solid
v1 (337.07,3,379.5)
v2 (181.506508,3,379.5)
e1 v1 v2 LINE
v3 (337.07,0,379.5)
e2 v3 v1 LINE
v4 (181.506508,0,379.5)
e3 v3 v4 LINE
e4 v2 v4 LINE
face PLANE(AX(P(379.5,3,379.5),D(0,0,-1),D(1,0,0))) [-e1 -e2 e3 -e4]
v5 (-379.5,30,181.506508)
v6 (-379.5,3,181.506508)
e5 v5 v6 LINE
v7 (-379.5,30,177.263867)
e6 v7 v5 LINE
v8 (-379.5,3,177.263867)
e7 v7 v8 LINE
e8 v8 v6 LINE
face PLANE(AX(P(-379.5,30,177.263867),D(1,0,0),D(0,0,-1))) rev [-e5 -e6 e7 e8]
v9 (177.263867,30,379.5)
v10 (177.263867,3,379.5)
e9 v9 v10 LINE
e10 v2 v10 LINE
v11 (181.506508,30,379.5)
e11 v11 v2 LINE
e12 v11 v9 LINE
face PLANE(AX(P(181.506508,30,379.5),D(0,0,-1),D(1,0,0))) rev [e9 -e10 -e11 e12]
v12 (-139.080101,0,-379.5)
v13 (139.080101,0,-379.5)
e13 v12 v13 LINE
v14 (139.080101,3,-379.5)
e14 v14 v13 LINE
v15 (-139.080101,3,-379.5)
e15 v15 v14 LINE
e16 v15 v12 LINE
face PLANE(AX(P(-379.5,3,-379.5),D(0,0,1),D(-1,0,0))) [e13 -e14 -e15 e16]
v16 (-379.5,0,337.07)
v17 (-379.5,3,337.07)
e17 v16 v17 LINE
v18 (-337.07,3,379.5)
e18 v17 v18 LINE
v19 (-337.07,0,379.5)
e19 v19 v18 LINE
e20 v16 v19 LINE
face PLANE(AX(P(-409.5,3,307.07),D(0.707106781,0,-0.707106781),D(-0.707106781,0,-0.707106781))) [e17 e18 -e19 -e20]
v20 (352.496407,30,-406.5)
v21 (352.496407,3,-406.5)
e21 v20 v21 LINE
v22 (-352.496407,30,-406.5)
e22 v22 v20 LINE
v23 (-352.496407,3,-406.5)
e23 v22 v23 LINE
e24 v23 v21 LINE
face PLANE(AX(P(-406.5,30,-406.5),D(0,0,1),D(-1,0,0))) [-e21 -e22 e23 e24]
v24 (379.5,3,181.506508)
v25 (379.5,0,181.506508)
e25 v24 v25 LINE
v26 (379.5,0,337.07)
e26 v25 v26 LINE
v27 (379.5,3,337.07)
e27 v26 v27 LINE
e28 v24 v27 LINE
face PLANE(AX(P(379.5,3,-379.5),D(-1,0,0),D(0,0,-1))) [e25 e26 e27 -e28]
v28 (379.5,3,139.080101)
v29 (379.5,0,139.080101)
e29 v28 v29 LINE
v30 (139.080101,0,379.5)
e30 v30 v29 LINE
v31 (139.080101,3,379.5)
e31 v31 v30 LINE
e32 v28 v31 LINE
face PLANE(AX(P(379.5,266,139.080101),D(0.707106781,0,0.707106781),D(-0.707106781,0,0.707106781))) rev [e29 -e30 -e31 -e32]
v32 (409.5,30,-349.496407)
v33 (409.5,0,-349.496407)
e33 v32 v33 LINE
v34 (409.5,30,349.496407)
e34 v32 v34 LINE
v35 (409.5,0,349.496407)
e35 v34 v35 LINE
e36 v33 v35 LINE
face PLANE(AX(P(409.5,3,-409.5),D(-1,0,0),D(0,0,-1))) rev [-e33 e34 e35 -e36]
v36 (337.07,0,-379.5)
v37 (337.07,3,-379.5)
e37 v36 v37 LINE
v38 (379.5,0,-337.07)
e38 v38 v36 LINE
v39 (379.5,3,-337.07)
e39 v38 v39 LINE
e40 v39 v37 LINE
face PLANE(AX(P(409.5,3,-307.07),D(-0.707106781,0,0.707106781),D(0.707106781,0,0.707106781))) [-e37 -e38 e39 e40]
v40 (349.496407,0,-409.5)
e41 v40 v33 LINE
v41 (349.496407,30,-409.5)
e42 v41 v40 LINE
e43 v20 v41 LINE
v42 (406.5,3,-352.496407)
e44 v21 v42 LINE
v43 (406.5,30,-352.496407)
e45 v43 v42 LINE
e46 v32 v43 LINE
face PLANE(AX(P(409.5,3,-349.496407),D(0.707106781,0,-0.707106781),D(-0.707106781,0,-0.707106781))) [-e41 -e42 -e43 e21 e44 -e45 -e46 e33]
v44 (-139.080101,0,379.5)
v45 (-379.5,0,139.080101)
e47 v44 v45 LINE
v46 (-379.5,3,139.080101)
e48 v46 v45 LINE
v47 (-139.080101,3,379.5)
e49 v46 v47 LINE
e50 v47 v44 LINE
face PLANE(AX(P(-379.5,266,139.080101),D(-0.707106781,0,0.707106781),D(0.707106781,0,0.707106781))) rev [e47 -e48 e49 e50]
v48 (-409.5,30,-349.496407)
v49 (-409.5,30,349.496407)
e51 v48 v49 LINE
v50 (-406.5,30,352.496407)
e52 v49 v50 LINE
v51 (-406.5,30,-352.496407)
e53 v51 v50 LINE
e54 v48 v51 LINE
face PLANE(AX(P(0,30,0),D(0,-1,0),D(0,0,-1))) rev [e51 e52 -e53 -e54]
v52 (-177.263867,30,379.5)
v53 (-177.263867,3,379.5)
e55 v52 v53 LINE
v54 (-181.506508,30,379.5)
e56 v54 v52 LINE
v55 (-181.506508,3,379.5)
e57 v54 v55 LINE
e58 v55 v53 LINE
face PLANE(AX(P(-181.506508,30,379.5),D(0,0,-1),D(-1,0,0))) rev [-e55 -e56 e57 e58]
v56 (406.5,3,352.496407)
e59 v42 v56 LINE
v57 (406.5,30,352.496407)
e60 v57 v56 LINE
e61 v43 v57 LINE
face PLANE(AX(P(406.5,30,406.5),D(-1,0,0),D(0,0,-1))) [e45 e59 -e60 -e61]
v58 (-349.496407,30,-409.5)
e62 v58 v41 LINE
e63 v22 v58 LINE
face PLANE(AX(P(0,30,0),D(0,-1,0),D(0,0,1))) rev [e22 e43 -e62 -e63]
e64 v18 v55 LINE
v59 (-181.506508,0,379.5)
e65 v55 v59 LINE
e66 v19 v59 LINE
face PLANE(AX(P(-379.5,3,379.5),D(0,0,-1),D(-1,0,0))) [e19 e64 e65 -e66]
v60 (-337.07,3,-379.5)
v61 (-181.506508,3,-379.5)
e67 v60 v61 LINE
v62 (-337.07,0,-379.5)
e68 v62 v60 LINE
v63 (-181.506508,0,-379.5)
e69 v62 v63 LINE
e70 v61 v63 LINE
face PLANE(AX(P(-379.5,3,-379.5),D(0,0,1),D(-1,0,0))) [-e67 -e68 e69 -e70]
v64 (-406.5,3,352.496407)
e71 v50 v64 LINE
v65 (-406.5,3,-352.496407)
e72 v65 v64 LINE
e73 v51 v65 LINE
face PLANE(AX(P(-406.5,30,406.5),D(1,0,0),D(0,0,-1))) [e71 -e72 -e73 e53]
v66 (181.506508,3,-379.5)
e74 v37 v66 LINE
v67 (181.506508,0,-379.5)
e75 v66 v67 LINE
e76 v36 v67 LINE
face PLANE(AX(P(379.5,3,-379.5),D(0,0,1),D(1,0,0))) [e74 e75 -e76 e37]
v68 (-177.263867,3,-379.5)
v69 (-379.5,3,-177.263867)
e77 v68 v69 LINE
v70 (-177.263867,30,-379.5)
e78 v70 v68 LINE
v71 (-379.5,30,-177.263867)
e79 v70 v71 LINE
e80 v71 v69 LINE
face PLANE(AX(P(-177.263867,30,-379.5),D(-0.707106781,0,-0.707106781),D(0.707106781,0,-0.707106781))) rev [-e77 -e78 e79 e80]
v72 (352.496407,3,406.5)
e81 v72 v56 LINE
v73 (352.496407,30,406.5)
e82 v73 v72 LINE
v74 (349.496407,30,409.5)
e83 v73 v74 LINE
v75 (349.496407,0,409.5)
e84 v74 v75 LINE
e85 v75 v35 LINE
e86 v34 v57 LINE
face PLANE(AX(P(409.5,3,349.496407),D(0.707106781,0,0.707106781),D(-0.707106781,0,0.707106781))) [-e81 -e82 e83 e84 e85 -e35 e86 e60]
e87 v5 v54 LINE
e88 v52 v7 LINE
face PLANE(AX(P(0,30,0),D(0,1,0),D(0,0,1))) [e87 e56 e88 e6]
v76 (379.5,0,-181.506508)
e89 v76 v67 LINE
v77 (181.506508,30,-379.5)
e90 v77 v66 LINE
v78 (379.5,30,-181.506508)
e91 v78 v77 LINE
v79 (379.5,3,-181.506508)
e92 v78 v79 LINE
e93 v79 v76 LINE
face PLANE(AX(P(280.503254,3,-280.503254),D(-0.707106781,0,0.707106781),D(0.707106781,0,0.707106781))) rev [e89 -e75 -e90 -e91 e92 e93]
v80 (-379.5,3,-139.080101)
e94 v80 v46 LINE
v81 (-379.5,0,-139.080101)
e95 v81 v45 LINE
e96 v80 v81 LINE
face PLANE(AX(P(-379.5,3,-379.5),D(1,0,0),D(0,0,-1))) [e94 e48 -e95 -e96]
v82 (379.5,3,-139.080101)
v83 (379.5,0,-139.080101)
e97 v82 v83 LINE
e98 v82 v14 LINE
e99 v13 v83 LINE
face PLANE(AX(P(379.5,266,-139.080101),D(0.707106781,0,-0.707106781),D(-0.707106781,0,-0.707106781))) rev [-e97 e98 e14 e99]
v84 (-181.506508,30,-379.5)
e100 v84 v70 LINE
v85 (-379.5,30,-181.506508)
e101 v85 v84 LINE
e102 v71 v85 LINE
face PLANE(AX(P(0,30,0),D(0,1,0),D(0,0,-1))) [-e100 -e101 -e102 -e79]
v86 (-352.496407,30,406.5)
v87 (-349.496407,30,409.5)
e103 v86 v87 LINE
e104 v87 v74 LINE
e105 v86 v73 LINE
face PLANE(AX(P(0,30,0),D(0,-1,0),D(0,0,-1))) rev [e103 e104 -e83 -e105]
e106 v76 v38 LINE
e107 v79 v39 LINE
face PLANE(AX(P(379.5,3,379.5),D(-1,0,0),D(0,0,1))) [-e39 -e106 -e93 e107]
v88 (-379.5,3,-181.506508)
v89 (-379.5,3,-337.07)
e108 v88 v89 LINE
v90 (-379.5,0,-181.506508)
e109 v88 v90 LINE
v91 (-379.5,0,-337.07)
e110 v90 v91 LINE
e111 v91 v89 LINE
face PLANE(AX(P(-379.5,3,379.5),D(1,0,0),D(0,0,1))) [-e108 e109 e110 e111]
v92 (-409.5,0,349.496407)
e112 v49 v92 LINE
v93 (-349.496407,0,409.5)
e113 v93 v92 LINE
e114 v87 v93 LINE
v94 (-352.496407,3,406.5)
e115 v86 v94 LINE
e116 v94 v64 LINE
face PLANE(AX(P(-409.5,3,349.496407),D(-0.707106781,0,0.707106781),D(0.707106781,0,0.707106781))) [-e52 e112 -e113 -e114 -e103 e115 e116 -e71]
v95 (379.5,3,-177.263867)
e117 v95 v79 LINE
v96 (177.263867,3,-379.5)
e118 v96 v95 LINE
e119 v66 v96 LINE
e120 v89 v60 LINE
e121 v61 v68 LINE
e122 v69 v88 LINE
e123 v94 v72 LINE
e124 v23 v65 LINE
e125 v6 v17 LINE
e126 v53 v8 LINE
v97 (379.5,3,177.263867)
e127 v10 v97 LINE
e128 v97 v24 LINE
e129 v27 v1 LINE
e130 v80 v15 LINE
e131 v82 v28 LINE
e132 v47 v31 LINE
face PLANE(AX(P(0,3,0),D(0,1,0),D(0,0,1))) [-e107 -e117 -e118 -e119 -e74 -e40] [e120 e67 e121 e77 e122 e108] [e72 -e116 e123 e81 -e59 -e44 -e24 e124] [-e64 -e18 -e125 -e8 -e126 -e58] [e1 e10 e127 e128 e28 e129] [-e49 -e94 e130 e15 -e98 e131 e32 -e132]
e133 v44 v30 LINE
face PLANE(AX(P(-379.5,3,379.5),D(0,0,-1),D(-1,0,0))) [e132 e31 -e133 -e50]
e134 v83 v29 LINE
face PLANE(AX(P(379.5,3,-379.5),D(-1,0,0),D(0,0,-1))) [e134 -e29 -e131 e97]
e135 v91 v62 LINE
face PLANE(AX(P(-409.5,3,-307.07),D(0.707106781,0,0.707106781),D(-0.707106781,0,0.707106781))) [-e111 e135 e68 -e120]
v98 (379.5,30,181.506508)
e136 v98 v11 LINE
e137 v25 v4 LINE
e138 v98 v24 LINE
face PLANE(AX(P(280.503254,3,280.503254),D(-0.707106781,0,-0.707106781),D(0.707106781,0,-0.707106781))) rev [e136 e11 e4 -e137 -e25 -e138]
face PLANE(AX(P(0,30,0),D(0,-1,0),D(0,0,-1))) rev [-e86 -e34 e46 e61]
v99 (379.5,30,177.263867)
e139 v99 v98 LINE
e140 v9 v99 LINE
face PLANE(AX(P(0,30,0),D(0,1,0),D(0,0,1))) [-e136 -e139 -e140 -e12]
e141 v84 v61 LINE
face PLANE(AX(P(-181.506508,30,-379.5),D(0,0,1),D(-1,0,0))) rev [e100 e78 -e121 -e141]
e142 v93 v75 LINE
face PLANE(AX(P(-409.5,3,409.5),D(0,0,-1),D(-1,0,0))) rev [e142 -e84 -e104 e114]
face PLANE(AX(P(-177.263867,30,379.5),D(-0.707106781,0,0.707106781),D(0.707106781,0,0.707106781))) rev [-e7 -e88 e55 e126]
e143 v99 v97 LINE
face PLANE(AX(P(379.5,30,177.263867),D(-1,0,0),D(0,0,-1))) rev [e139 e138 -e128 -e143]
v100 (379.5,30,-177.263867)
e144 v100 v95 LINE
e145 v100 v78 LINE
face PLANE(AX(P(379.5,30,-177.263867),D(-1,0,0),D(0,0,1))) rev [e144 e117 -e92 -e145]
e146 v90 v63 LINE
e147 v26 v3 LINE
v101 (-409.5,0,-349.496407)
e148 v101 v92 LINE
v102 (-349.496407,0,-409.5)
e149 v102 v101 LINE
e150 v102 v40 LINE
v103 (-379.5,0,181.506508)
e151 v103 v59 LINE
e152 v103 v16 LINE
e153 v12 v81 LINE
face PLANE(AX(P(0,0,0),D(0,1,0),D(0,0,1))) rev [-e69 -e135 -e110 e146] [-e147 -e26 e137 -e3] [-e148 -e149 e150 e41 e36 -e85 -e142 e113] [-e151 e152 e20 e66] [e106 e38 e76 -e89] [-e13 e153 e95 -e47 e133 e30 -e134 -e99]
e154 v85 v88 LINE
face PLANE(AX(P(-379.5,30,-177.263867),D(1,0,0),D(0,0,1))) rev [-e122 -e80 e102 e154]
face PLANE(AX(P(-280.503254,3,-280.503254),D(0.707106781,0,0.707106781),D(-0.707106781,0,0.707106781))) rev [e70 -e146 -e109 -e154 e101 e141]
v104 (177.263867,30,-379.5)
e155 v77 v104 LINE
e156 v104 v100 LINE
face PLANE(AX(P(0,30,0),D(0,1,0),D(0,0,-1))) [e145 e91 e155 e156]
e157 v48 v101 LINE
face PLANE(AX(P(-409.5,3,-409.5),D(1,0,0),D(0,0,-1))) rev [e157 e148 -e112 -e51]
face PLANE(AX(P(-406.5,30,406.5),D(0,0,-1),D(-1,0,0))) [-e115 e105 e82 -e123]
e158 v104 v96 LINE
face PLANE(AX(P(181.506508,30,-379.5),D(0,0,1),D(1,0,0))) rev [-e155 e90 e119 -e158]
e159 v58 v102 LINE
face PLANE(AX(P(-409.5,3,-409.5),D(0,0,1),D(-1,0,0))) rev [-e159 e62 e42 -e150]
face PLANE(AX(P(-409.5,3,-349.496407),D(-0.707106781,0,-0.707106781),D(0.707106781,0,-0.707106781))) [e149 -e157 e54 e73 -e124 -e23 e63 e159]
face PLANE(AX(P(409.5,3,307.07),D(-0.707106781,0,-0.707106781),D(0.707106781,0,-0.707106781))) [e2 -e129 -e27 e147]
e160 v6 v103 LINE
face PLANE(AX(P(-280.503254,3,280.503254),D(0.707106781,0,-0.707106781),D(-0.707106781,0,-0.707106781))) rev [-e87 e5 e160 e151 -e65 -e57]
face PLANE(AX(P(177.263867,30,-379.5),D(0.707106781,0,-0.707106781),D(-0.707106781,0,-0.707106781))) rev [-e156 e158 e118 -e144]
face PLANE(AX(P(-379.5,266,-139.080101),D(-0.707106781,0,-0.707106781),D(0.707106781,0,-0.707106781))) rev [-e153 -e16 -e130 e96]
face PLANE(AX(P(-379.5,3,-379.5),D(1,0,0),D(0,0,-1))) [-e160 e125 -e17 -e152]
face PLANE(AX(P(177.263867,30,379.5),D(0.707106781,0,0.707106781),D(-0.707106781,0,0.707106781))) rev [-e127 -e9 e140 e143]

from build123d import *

# Parameters (mm, degrees)
SKETCH1_W            = 819
SKETCH1_H            = 819
SKETCH1_W_2          = 759
SKETCH1_H_2          = 759
BOSS_EXTRUDE1_DEPTH  = 3
SKETCH2_W            = 819
SKETCH2_H            = 819
SKETCH2_W_2          = 813
SKETCH2_H_2          = 813
BOSS_EXTRUDE2_DEPTH  = 27
BOSS_EXTRUDE3_DEPTH  = 3
CUT_EXTRUDE1_DEPTH   = 130
BOSS_EXTRUDE4_DEPTH  = 3
BOSS_EXTRUDE5_DEPTH  = 27
CUT_EXTRUDE2_DEPTH   = 163
MIRROR3_DEPTH        = 30
MIRROR3_2_DEPTH      = 3
MIRROR4_DEPTH        = 30
MIRROR4_2_DEPTH      = 3
CUT_EXTRUDE3_START   = -673
CUT_EXTRUDE3_DEPTH   = 1124
CUT_EXTRUDE4_DEPTH   = 300
BOSS_EXTRUDE8_DEPTH  = 3
BOSS_EXTRUDE9_DEPTH  = 27
BOSS_EXTRUDE10_DEPTH = 3
CUT_EXTRUDE9_DEPTH   = 266
CUT_EXTRUDE10_DEPTH  = 27
CUT_EXTRUDE11_DEPTH  = 27
BOSS_EXTRUDE13_DEPTH = 27
BOSS_EXTRUDE15_DEPTH = 3
BOSS_EXTRUDE16_DEPTH = 27
MIRROR17_DEPTH       = 3
MIRROR17_START       = 3
MIRROR17_2_DEPTH     = 27
MIRROR26_DEPTH       = 3
MIRROR26_START       = 3
MIRROR26_2_DEPTH     = 27


# Read off the part's stored shape, not the designer's step: Mirror3, Mirror4, Mirror17, Mirror26
with BuildPart() as part:
    # Sketch1 → Boss-Extrude1 (new body)
    with BuildSketch(Plane(origin=(0, 0, 0), x_dir=(1, 0, 0), z_dir=(0, 1, 0))):
        Rectangle(SKETCH1_W, SKETCH1_H)
        Rectangle(SKETCH1_W_2, SKETCH1_H_2, mode=Mode.SUBTRACT)
    extrude(amount=BOSS_EXTRUDE1_DEPTH)

    # Sketch2 → Boss-Extrude2 (add)
    with BuildSketch(Plane(origin=(0, 3, 0), x_dir=(1, 0, 0), z_dir=(0, 1, 0))):
        Rectangle(SKETCH2_W, SKETCH2_H)
        Rectangle(SKETCH2_W_2, SKETCH2_H_2, mode=Mode.SUBTRACT)
    extrude(amount=BOSS_EXTRUDE2_DEPTH)

    # Sketch3 → Boss-Extrude3 (add)
    with BuildSketch(Plane.XZ):
        Polygon((-294.643593129, 379.5), (-337.07, 379.5), (-379.5, 337.07), (-379.5, 294.643593129), align=None)
    extrude(amount=-BOSS_EXTRUDE3_DEPTH)

    # Sketch4 → Cut-Extrude1 (cut)
    with BuildSketch(Plane(origin=(0, 0, 0), x_dir=(-1, 0, 0), z_dir=(0, -1, 0))):
        Polygon((358.285, -358.285), (409.5, -307.07), (409.5, -409.5), (307.07, -409.5), align=None)
    extrude(amount=-CUT_EXTRUDE1_DEPTH, mode=Mode.SUBTRACT)

    # Sketch7 → Boss-Extrude4 (add)
    with BuildSketch(Plane(origin=(0, 0, 0), x_dir=(-1, 0, 0), z_dir=(0, -1, 0))):
        Polygon((409.5, -109.080101268), (409.5, -73.724762208), (73.724762208, -409.5), (109.080101268, -409.5), align=None)
    extrude(amount=-BOSS_EXTRUDE4_DEPTH)

    # Sketch8 → Boss-Extrude5 (add)
    with BuildSketch(Plane(origin=(0, 3, 0), x_dir=(1, 0, 0), z_dir=(0, 1, 0))):
        Polygon((-406.5, -76.724762208), (-406.5, -80.967402896), (-80.967402896, -406.5), (-76.724762208, -406.5), align=None)
    extrude(amount=BOSS_EXTRUDE5_DEPTH)

    # Sketch10 → Cut-Extrude2 (cut)
    with BuildSketch(Plane(origin=(0, 0, 0), x_dir=(-1, 0, 0), z_dir=(0, -1, 0))):
        Polygon((0, -409.5), (0, 0), (409.5, 0), (409.5, 409.5), (-409.5, 409.5), (-409.5, -409.5), align=None)
    extrude(amount=-CUT_EXTRUDE2_DEPTH, mode=Mode.SUBTRACT)

    # Mirror3 outline → Mirror3 (add)
    with BuildSketch(Plane(origin=(0, 0, 0), x_dir=(1, 0, 0), z_dir=(0, 1, 0))):
        Polygon((406.5, -76.724762208), (76.724762208, -406.5), (0, -406.5), (0, -409.5), (307.07, -409.5), (310.07, -406.5), (80.967402896, -406.5), (406.5, -80.967402896), (406.5, -310.07), (409.5, -307.07), (409.5, 0), (406.5, 0), align=None)
    extrude(amount=MIRROR3_DEPTH)

    # Mirror3 2 outline → Mirror3 2 (add)
    # profile 1 of 3: a face of its own
    with BuildSketch(Plane(origin=(0, 0, 0), x_dir=(1, 0, 0), z_dir=(0, 1, 0))):
        Polygon((0, -406.5), (76.724762208, -406.5), (103.724762208, -379.5), (0, -379.5), align=None)
    # profile 2 of 3: a face of its own
    with BuildSketch(Plane(origin=(0, 0, 0), x_dir=(1, 0, 0), z_dir=(0, 1, 0))):
        Polygon((379.5, 0), (379.5, -103.724762208), (406.5, -76.724762208), (406.5, 0), align=None)
    # profile 3 of 3: a face of its own
    with BuildSketch(Plane(origin=(0, 0, 0), x_dir=(1, 0, 0), z_dir=(0, 1, 0))):
        Polygon((80.967402896, -406.5), (310.07, -406.5), (406.5, -310.07), (406.5, -80.967402896), align=None)
        Polygon((379.5, -294.643593129), (294.643593129, -379.5), (139.080101268, -379.5), (379.5, -139.080101268), align=None, mode=Mode.SUBTRACT)
    extrude(amount=MIRROR3_2_DEPTH)

    # Mirror4 outline → Mirror4 (add)
    with BuildSketch(Plane(origin=(0, 0, 0), x_dir=(1, 0, 0), z_dir=(0, 1, 0))):
        Polygon((-409.5, 0), (-406.5, 0), (-406.5, 76.724762208), (-76.724762208, 406.5), (76.724762208, 406.5), (406.5, 76.724762208), (406.5, 0), (409.5, 0), (409.5, 307.07), (406.5, 310.07), (406.5, 80.967402896), (80.967402896, 406.5), (310.07, 406.5), (307.07, 409.5), (-307.07, 409.5), (-310.07, 406.5), (-80.967402896, 406.5), (-406.5, 80.967402896), (-406.5, 310.07), (-409.5, 307.07), align=None)
    extrude(amount=MIRROR4_DEPTH)

    # Mirror4 2 outline → Mirror4 2 (add)
    # profile 1 of 5: a face of its own
    with BuildSketch(Plane(origin=(0, 0, 0), x_dir=(1, 0, 0), z_dir=(0, 1, 0))):
        Polygon((-406.5, 76.724762208), (-406.5, 0), (-379.5, 0), (-379.5, 103.724762208), align=None)
    # profile 2 of 5: a face of its own
    with BuildSketch(Plane(origin=(0, 0, 0), x_dir=(1, 0, 0), z_dir=(0, 1, 0))):
        Polygon((-76.724762208, 406.5), (-103.724762208, 379.5), (103.724762208, 379.5), (76.724762208, 406.5), align=None)
    # profile 3 of 5: a face of its own
    with BuildSketch(Plane(origin=(0, 0, 0), x_dir=(1, 0, 0), z_dir=(0, 1, 0))):
        Polygon((-310.07, 406.5), (-406.5, 310.07), (-406.5, 80.967402896), (-80.967402896, 406.5), align=None)
        Polygon((-139.080101268, 379.5), (-379.5, 139.080101268), (-379.5, 294.643593129), (-294.643593129, 379.5), align=None, mode=Mode.SUBTRACT)
    # profile 4 of 5: a face of its own
    with BuildSketch(Plane(origin=(0, 0, 0), x_dir=(1, 0, 0), z_dir=(0, 1, 0))):
        Polygon((406.5, 76.724762208), (379.5, 103.724762208), (379.5, 0), (406.5, 0), align=None)
    # profile 5 of 5: a face of its own
    with BuildSketch(Plane(origin=(0, 0, 0), x_dir=(1, 0, 0), z_dir=(0, 1, 0))):
        Polygon((406.5, 310.07), (310.07, 406.5), (80.967402896, 406.5), (406.5, 80.967402896), align=None)
        Polygon((294.643593129, 379.5), (379.5, 294.643593129), (379.5, 139.080101268), (139.080101268, 379.5), align=None, mode=Mode.SUBTRACT)
    extrude(amount=MIRROR4_2_DEPTH)

    # Sketch12 → Cut-Extrude3 (cut)
    with BuildSketch(Plane(origin=(0, 0, 0), x_dir=(-1, 0, 0), z_dir=(0, -1, 0)).offset(CUT_EXTRUDE3_START)):
        Polygon((379.5, -337.07), (379.5, -294.643593129), (294.643593129, -379.5), (337.07, -379.5), align=None)
    extrude(amount=CUT_EXTRUDE3_DEPTH, mode=Mode.SUBTRACT)

    # Sketch13 → Cut-Extrude4 (cut)
    with BuildSketch(Plane.XZ):
        Polygon((-409.5, 0), (0, 0), (0, 409.5), (505.643397908, 433.197413997), (586.960318624, -390.321219438), (40.755373804, -460.11749056), (-470.159650687, -449.460798141), align=None)
    extrude(amount=-CUT_EXTRUDE4_DEPTH, mode=Mode.SUBTRACT)

    # Sketch14 → Boss-Extrude8 (add)
    with BuildSketch(Plane.XZ):
        Polygon((-409.5, 307.07), (-307.07, 409.5), (-335.354271247, 409.5), (-409.5, 335.354271247), align=None)
    extrude(amount=-BOSS_EXTRUDE8_DEPTH)

    # Sketch16 → Boss-Extrude9 (add)
    with BuildSketch(Plane(origin=(0, 3, 0), x_dir=(1, 0, 0), z_dir=(0, 1, 0))):
        Polygon((-409.5, -307.07), (-406.5, -310.07), (-406.5, -338.354271247), (-409.5, -335.354271247), align=None)
        Polygon((-307.07, -409.5), (-310.07, -406.5), (-338.354271247, -406.5), (-335.354271247, -409.5), align=None)
    extrude(amount=BOSS_EXTRUDE9_DEPTH)

    # Sketch17 → Boss-Extrude10 (add)
    with BuildSketch(Plane(origin=(0, 0, 0), x_dir=(-1, 0, 0), z_dir=(0, -1, 0))):
        Polygon((181.506508139, -379.5), (379.5, -181.506508139), (379.5, -139.080101268), (139.080101268, -379.5), align=None)
    extrude(amount=-BOSS_EXTRUDE10_DEPTH)

    # Sketch18 → Cut-Extrude9 (cut)
    with BuildSketch(Plane(origin=(0, 0, 0), x_dir=(-1, 0, 0), z_dir=(0, -1, 0))):
        Polygon((379.5, -103.724762208), (103.724762208, -379.5), (139.080101268, -379.5), (379.5, -139.080101268), align=None)
    extrude(amount=-CUT_EXTRUDE9_DEPTH, mode=Mode.SUBTRACT)

    # Sketch19 → Cut-Extrude10 (cut)
    with BuildSketch(Plane(origin=(0, 30, 0), x_dir=(1, 0, 0), z_dir=(0, 1, 0))):
        Polygon((-406.5, -80.967402896), (-406.5, -76.724762208), (-379.5, -103.724762208), (-379.5, -107.967402896), align=None)
    extrude(amount=-CUT_EXTRUDE10_DEPTH, mode=Mode.SUBTRACT)

    # Sketch20 → Cut-Extrude11 (cut)
    with BuildSketch(Plane(origin=(0, 30, 0), x_dir=(1, 0, 0), z_dir=(0, 1, 0))):
        Polygon((-107.967402896, -379.5), (-103.724762208, -379.5), (-76.724762208, -406.5), (-80.967402896, -406.5), align=None)
    extrude(amount=-CUT_EXTRUDE11_DEPTH, mode=Mode.SUBTRACT)

    # Sketch21 → Boss-Extrude13 (add)
    with BuildSketch(Plane(origin=(0, 3, 0), x_dir=(1, 0, 0), z_dir=(0, 1, 0))):
        Polygon((-379.5, -181.506508139), (-181.506508139, -379.5), (-177.263867452, -379.5), (-379.5, -177.263867452), align=None)
    extrude(amount=BOSS_EXTRUDE13_DEPTH)

    # Sketch22 → Boss-Extrude15 (add)
    with BuildSketch(Plane(origin=(0, 0, 0), x_dir=(-1, 0, 0), z_dir=(0, -1, 0))):
        Polygon((409.5, -335.354271247), (335.354271247, -409.5), (349.496406871, -409.5), (409.5, -349.496406871), align=None)
    extrude(amount=-BOSS_EXTRUDE15_DEPTH)

    # Sketch23 → Boss-Extrude16 (add)
    with BuildSketch(Plane(origin=(0, 3, 0), x_dir=(1, 0, 0), z_dir=(0, 1, 0))):
        Polygon((-406.5, -338.354271247), (-409.5, -335.354271247), (-409.5, -349.496406871), (-406.5, -352.496406871), align=None)
        Polygon((-338.354271247, -406.5), (-352.496406871, -406.5), (-349.496406871, -409.5), (-335.354271247, -409.5), align=None)
    extrude(amount=BOSS_EXTRUDE16_DEPTH)

    # Mirror17 outline → Mirror17 (add)
    with BuildSketch(Plane(origin=(0, 0, 0), x_dir=(1, 0, 0), z_dir=(0, 1, 0))):
        Polygon((379.5, -139.080101268), (139.080101268, -379.5), (0, -379.5), (0, -409.5), (349.496406871, -409.5), (409.5, -349.496406871), (409.5, 0), (379.5, 0), align=None)
        Polygon((379.5, -337.07), (337.07, -379.5), (181.506508139, -379.5), (379.5, -181.506508139), align=None, mode=Mode.SUBTRACT)
    extrude(amount=MIRROR17_DEPTH)

    # Mirror17 2 outline → Mirror17 2 (add)
    with BuildSketch(Plane(origin=(0, 0, 0), x_dir=(1, 0, 0), z_dir=(0, 1, 0)).offset(MIRROR17_START)):
        Polygon((352.496406871, -406.5), (0, -406.5), (0, -409.5), (349.496406871, -409.5), align=None)
        Polygon((409.5, 0), (406.5, 0), (406.5, -352.496406871), (409.5, -349.496406871), align=None)
        Polygon((177.263867452, -379.5), (181.506508139, -379.5), (379.5, -181.506508139), (379.5, -177.263867452), align=None)
    extrude(amount=MIRROR17_2_DEPTH)

    # Mirror26 outline → Mirror26 (add)
    with BuildSketch(Plane(origin=(0, 0, 0), x_dir=(1, 0, 0), z_dir=(0, 1, 0))):
        Polygon((-379.5, 0), (-379.5, 139.080101268), (-139.080101268, 379.5), (139.080101268, 379.5), (379.5, 139.080101268), (379.5, 0), (409.5, 0), (409.5, 349.496406871), (349.496406871, 409.5), (-349.496406871, 409.5), (-409.5, 349.496406871), (-409.5, 0), align=None)
        Polygon((-337.07, 379.5), (-181.506508139, 379.5), (-379.5, 181.506508139), (-379.5, 337.07), align=None, mode=Mode.SUBTRACT)
        Polygon((337.07, 379.5), (379.5, 337.07), (379.5, 181.506508139), (181.506508139, 379.5), align=None, mode=Mode.SUBTRACT)
    extrude(amount=MIRROR26_DEPTH)

    # Mirror26 2 outline → Mirror26 2 (add)
    with BuildSketch(Plane(origin=(0, 0, 0), x_dir=(1, 0, 0), z_dir=(0, 1, 0)).offset(MIRROR26_START)):
        Polygon((-409.5, 0), (-406.5, 0), (-406.5, 352.496406871), (-409.5, 349.496406871), align=None)
        Polygon((-349.496406871, 409.5), (-352.496406871, 406.5), (352.496406871, 406.5), (349.496406871, 409.5), align=None)
        Polygon((409.5, 349.496406871), (406.5, 352.496406871), (406.5, 0), (409.5, 0), align=None)
        Polygon((-181.506508139, 379.5), (-379.5, 181.506508139), (-379.5, 177.263867452), (-177.263867452, 379.5), align=None)
        Polygon((379.5, 177.263867452), (379.5, 181.506508139), (181.506508139, 379.5), (177.263867452, 379.5), align=None)
    extrude(amount=MIRROR26_2_DEPTH)


solid = part.part
